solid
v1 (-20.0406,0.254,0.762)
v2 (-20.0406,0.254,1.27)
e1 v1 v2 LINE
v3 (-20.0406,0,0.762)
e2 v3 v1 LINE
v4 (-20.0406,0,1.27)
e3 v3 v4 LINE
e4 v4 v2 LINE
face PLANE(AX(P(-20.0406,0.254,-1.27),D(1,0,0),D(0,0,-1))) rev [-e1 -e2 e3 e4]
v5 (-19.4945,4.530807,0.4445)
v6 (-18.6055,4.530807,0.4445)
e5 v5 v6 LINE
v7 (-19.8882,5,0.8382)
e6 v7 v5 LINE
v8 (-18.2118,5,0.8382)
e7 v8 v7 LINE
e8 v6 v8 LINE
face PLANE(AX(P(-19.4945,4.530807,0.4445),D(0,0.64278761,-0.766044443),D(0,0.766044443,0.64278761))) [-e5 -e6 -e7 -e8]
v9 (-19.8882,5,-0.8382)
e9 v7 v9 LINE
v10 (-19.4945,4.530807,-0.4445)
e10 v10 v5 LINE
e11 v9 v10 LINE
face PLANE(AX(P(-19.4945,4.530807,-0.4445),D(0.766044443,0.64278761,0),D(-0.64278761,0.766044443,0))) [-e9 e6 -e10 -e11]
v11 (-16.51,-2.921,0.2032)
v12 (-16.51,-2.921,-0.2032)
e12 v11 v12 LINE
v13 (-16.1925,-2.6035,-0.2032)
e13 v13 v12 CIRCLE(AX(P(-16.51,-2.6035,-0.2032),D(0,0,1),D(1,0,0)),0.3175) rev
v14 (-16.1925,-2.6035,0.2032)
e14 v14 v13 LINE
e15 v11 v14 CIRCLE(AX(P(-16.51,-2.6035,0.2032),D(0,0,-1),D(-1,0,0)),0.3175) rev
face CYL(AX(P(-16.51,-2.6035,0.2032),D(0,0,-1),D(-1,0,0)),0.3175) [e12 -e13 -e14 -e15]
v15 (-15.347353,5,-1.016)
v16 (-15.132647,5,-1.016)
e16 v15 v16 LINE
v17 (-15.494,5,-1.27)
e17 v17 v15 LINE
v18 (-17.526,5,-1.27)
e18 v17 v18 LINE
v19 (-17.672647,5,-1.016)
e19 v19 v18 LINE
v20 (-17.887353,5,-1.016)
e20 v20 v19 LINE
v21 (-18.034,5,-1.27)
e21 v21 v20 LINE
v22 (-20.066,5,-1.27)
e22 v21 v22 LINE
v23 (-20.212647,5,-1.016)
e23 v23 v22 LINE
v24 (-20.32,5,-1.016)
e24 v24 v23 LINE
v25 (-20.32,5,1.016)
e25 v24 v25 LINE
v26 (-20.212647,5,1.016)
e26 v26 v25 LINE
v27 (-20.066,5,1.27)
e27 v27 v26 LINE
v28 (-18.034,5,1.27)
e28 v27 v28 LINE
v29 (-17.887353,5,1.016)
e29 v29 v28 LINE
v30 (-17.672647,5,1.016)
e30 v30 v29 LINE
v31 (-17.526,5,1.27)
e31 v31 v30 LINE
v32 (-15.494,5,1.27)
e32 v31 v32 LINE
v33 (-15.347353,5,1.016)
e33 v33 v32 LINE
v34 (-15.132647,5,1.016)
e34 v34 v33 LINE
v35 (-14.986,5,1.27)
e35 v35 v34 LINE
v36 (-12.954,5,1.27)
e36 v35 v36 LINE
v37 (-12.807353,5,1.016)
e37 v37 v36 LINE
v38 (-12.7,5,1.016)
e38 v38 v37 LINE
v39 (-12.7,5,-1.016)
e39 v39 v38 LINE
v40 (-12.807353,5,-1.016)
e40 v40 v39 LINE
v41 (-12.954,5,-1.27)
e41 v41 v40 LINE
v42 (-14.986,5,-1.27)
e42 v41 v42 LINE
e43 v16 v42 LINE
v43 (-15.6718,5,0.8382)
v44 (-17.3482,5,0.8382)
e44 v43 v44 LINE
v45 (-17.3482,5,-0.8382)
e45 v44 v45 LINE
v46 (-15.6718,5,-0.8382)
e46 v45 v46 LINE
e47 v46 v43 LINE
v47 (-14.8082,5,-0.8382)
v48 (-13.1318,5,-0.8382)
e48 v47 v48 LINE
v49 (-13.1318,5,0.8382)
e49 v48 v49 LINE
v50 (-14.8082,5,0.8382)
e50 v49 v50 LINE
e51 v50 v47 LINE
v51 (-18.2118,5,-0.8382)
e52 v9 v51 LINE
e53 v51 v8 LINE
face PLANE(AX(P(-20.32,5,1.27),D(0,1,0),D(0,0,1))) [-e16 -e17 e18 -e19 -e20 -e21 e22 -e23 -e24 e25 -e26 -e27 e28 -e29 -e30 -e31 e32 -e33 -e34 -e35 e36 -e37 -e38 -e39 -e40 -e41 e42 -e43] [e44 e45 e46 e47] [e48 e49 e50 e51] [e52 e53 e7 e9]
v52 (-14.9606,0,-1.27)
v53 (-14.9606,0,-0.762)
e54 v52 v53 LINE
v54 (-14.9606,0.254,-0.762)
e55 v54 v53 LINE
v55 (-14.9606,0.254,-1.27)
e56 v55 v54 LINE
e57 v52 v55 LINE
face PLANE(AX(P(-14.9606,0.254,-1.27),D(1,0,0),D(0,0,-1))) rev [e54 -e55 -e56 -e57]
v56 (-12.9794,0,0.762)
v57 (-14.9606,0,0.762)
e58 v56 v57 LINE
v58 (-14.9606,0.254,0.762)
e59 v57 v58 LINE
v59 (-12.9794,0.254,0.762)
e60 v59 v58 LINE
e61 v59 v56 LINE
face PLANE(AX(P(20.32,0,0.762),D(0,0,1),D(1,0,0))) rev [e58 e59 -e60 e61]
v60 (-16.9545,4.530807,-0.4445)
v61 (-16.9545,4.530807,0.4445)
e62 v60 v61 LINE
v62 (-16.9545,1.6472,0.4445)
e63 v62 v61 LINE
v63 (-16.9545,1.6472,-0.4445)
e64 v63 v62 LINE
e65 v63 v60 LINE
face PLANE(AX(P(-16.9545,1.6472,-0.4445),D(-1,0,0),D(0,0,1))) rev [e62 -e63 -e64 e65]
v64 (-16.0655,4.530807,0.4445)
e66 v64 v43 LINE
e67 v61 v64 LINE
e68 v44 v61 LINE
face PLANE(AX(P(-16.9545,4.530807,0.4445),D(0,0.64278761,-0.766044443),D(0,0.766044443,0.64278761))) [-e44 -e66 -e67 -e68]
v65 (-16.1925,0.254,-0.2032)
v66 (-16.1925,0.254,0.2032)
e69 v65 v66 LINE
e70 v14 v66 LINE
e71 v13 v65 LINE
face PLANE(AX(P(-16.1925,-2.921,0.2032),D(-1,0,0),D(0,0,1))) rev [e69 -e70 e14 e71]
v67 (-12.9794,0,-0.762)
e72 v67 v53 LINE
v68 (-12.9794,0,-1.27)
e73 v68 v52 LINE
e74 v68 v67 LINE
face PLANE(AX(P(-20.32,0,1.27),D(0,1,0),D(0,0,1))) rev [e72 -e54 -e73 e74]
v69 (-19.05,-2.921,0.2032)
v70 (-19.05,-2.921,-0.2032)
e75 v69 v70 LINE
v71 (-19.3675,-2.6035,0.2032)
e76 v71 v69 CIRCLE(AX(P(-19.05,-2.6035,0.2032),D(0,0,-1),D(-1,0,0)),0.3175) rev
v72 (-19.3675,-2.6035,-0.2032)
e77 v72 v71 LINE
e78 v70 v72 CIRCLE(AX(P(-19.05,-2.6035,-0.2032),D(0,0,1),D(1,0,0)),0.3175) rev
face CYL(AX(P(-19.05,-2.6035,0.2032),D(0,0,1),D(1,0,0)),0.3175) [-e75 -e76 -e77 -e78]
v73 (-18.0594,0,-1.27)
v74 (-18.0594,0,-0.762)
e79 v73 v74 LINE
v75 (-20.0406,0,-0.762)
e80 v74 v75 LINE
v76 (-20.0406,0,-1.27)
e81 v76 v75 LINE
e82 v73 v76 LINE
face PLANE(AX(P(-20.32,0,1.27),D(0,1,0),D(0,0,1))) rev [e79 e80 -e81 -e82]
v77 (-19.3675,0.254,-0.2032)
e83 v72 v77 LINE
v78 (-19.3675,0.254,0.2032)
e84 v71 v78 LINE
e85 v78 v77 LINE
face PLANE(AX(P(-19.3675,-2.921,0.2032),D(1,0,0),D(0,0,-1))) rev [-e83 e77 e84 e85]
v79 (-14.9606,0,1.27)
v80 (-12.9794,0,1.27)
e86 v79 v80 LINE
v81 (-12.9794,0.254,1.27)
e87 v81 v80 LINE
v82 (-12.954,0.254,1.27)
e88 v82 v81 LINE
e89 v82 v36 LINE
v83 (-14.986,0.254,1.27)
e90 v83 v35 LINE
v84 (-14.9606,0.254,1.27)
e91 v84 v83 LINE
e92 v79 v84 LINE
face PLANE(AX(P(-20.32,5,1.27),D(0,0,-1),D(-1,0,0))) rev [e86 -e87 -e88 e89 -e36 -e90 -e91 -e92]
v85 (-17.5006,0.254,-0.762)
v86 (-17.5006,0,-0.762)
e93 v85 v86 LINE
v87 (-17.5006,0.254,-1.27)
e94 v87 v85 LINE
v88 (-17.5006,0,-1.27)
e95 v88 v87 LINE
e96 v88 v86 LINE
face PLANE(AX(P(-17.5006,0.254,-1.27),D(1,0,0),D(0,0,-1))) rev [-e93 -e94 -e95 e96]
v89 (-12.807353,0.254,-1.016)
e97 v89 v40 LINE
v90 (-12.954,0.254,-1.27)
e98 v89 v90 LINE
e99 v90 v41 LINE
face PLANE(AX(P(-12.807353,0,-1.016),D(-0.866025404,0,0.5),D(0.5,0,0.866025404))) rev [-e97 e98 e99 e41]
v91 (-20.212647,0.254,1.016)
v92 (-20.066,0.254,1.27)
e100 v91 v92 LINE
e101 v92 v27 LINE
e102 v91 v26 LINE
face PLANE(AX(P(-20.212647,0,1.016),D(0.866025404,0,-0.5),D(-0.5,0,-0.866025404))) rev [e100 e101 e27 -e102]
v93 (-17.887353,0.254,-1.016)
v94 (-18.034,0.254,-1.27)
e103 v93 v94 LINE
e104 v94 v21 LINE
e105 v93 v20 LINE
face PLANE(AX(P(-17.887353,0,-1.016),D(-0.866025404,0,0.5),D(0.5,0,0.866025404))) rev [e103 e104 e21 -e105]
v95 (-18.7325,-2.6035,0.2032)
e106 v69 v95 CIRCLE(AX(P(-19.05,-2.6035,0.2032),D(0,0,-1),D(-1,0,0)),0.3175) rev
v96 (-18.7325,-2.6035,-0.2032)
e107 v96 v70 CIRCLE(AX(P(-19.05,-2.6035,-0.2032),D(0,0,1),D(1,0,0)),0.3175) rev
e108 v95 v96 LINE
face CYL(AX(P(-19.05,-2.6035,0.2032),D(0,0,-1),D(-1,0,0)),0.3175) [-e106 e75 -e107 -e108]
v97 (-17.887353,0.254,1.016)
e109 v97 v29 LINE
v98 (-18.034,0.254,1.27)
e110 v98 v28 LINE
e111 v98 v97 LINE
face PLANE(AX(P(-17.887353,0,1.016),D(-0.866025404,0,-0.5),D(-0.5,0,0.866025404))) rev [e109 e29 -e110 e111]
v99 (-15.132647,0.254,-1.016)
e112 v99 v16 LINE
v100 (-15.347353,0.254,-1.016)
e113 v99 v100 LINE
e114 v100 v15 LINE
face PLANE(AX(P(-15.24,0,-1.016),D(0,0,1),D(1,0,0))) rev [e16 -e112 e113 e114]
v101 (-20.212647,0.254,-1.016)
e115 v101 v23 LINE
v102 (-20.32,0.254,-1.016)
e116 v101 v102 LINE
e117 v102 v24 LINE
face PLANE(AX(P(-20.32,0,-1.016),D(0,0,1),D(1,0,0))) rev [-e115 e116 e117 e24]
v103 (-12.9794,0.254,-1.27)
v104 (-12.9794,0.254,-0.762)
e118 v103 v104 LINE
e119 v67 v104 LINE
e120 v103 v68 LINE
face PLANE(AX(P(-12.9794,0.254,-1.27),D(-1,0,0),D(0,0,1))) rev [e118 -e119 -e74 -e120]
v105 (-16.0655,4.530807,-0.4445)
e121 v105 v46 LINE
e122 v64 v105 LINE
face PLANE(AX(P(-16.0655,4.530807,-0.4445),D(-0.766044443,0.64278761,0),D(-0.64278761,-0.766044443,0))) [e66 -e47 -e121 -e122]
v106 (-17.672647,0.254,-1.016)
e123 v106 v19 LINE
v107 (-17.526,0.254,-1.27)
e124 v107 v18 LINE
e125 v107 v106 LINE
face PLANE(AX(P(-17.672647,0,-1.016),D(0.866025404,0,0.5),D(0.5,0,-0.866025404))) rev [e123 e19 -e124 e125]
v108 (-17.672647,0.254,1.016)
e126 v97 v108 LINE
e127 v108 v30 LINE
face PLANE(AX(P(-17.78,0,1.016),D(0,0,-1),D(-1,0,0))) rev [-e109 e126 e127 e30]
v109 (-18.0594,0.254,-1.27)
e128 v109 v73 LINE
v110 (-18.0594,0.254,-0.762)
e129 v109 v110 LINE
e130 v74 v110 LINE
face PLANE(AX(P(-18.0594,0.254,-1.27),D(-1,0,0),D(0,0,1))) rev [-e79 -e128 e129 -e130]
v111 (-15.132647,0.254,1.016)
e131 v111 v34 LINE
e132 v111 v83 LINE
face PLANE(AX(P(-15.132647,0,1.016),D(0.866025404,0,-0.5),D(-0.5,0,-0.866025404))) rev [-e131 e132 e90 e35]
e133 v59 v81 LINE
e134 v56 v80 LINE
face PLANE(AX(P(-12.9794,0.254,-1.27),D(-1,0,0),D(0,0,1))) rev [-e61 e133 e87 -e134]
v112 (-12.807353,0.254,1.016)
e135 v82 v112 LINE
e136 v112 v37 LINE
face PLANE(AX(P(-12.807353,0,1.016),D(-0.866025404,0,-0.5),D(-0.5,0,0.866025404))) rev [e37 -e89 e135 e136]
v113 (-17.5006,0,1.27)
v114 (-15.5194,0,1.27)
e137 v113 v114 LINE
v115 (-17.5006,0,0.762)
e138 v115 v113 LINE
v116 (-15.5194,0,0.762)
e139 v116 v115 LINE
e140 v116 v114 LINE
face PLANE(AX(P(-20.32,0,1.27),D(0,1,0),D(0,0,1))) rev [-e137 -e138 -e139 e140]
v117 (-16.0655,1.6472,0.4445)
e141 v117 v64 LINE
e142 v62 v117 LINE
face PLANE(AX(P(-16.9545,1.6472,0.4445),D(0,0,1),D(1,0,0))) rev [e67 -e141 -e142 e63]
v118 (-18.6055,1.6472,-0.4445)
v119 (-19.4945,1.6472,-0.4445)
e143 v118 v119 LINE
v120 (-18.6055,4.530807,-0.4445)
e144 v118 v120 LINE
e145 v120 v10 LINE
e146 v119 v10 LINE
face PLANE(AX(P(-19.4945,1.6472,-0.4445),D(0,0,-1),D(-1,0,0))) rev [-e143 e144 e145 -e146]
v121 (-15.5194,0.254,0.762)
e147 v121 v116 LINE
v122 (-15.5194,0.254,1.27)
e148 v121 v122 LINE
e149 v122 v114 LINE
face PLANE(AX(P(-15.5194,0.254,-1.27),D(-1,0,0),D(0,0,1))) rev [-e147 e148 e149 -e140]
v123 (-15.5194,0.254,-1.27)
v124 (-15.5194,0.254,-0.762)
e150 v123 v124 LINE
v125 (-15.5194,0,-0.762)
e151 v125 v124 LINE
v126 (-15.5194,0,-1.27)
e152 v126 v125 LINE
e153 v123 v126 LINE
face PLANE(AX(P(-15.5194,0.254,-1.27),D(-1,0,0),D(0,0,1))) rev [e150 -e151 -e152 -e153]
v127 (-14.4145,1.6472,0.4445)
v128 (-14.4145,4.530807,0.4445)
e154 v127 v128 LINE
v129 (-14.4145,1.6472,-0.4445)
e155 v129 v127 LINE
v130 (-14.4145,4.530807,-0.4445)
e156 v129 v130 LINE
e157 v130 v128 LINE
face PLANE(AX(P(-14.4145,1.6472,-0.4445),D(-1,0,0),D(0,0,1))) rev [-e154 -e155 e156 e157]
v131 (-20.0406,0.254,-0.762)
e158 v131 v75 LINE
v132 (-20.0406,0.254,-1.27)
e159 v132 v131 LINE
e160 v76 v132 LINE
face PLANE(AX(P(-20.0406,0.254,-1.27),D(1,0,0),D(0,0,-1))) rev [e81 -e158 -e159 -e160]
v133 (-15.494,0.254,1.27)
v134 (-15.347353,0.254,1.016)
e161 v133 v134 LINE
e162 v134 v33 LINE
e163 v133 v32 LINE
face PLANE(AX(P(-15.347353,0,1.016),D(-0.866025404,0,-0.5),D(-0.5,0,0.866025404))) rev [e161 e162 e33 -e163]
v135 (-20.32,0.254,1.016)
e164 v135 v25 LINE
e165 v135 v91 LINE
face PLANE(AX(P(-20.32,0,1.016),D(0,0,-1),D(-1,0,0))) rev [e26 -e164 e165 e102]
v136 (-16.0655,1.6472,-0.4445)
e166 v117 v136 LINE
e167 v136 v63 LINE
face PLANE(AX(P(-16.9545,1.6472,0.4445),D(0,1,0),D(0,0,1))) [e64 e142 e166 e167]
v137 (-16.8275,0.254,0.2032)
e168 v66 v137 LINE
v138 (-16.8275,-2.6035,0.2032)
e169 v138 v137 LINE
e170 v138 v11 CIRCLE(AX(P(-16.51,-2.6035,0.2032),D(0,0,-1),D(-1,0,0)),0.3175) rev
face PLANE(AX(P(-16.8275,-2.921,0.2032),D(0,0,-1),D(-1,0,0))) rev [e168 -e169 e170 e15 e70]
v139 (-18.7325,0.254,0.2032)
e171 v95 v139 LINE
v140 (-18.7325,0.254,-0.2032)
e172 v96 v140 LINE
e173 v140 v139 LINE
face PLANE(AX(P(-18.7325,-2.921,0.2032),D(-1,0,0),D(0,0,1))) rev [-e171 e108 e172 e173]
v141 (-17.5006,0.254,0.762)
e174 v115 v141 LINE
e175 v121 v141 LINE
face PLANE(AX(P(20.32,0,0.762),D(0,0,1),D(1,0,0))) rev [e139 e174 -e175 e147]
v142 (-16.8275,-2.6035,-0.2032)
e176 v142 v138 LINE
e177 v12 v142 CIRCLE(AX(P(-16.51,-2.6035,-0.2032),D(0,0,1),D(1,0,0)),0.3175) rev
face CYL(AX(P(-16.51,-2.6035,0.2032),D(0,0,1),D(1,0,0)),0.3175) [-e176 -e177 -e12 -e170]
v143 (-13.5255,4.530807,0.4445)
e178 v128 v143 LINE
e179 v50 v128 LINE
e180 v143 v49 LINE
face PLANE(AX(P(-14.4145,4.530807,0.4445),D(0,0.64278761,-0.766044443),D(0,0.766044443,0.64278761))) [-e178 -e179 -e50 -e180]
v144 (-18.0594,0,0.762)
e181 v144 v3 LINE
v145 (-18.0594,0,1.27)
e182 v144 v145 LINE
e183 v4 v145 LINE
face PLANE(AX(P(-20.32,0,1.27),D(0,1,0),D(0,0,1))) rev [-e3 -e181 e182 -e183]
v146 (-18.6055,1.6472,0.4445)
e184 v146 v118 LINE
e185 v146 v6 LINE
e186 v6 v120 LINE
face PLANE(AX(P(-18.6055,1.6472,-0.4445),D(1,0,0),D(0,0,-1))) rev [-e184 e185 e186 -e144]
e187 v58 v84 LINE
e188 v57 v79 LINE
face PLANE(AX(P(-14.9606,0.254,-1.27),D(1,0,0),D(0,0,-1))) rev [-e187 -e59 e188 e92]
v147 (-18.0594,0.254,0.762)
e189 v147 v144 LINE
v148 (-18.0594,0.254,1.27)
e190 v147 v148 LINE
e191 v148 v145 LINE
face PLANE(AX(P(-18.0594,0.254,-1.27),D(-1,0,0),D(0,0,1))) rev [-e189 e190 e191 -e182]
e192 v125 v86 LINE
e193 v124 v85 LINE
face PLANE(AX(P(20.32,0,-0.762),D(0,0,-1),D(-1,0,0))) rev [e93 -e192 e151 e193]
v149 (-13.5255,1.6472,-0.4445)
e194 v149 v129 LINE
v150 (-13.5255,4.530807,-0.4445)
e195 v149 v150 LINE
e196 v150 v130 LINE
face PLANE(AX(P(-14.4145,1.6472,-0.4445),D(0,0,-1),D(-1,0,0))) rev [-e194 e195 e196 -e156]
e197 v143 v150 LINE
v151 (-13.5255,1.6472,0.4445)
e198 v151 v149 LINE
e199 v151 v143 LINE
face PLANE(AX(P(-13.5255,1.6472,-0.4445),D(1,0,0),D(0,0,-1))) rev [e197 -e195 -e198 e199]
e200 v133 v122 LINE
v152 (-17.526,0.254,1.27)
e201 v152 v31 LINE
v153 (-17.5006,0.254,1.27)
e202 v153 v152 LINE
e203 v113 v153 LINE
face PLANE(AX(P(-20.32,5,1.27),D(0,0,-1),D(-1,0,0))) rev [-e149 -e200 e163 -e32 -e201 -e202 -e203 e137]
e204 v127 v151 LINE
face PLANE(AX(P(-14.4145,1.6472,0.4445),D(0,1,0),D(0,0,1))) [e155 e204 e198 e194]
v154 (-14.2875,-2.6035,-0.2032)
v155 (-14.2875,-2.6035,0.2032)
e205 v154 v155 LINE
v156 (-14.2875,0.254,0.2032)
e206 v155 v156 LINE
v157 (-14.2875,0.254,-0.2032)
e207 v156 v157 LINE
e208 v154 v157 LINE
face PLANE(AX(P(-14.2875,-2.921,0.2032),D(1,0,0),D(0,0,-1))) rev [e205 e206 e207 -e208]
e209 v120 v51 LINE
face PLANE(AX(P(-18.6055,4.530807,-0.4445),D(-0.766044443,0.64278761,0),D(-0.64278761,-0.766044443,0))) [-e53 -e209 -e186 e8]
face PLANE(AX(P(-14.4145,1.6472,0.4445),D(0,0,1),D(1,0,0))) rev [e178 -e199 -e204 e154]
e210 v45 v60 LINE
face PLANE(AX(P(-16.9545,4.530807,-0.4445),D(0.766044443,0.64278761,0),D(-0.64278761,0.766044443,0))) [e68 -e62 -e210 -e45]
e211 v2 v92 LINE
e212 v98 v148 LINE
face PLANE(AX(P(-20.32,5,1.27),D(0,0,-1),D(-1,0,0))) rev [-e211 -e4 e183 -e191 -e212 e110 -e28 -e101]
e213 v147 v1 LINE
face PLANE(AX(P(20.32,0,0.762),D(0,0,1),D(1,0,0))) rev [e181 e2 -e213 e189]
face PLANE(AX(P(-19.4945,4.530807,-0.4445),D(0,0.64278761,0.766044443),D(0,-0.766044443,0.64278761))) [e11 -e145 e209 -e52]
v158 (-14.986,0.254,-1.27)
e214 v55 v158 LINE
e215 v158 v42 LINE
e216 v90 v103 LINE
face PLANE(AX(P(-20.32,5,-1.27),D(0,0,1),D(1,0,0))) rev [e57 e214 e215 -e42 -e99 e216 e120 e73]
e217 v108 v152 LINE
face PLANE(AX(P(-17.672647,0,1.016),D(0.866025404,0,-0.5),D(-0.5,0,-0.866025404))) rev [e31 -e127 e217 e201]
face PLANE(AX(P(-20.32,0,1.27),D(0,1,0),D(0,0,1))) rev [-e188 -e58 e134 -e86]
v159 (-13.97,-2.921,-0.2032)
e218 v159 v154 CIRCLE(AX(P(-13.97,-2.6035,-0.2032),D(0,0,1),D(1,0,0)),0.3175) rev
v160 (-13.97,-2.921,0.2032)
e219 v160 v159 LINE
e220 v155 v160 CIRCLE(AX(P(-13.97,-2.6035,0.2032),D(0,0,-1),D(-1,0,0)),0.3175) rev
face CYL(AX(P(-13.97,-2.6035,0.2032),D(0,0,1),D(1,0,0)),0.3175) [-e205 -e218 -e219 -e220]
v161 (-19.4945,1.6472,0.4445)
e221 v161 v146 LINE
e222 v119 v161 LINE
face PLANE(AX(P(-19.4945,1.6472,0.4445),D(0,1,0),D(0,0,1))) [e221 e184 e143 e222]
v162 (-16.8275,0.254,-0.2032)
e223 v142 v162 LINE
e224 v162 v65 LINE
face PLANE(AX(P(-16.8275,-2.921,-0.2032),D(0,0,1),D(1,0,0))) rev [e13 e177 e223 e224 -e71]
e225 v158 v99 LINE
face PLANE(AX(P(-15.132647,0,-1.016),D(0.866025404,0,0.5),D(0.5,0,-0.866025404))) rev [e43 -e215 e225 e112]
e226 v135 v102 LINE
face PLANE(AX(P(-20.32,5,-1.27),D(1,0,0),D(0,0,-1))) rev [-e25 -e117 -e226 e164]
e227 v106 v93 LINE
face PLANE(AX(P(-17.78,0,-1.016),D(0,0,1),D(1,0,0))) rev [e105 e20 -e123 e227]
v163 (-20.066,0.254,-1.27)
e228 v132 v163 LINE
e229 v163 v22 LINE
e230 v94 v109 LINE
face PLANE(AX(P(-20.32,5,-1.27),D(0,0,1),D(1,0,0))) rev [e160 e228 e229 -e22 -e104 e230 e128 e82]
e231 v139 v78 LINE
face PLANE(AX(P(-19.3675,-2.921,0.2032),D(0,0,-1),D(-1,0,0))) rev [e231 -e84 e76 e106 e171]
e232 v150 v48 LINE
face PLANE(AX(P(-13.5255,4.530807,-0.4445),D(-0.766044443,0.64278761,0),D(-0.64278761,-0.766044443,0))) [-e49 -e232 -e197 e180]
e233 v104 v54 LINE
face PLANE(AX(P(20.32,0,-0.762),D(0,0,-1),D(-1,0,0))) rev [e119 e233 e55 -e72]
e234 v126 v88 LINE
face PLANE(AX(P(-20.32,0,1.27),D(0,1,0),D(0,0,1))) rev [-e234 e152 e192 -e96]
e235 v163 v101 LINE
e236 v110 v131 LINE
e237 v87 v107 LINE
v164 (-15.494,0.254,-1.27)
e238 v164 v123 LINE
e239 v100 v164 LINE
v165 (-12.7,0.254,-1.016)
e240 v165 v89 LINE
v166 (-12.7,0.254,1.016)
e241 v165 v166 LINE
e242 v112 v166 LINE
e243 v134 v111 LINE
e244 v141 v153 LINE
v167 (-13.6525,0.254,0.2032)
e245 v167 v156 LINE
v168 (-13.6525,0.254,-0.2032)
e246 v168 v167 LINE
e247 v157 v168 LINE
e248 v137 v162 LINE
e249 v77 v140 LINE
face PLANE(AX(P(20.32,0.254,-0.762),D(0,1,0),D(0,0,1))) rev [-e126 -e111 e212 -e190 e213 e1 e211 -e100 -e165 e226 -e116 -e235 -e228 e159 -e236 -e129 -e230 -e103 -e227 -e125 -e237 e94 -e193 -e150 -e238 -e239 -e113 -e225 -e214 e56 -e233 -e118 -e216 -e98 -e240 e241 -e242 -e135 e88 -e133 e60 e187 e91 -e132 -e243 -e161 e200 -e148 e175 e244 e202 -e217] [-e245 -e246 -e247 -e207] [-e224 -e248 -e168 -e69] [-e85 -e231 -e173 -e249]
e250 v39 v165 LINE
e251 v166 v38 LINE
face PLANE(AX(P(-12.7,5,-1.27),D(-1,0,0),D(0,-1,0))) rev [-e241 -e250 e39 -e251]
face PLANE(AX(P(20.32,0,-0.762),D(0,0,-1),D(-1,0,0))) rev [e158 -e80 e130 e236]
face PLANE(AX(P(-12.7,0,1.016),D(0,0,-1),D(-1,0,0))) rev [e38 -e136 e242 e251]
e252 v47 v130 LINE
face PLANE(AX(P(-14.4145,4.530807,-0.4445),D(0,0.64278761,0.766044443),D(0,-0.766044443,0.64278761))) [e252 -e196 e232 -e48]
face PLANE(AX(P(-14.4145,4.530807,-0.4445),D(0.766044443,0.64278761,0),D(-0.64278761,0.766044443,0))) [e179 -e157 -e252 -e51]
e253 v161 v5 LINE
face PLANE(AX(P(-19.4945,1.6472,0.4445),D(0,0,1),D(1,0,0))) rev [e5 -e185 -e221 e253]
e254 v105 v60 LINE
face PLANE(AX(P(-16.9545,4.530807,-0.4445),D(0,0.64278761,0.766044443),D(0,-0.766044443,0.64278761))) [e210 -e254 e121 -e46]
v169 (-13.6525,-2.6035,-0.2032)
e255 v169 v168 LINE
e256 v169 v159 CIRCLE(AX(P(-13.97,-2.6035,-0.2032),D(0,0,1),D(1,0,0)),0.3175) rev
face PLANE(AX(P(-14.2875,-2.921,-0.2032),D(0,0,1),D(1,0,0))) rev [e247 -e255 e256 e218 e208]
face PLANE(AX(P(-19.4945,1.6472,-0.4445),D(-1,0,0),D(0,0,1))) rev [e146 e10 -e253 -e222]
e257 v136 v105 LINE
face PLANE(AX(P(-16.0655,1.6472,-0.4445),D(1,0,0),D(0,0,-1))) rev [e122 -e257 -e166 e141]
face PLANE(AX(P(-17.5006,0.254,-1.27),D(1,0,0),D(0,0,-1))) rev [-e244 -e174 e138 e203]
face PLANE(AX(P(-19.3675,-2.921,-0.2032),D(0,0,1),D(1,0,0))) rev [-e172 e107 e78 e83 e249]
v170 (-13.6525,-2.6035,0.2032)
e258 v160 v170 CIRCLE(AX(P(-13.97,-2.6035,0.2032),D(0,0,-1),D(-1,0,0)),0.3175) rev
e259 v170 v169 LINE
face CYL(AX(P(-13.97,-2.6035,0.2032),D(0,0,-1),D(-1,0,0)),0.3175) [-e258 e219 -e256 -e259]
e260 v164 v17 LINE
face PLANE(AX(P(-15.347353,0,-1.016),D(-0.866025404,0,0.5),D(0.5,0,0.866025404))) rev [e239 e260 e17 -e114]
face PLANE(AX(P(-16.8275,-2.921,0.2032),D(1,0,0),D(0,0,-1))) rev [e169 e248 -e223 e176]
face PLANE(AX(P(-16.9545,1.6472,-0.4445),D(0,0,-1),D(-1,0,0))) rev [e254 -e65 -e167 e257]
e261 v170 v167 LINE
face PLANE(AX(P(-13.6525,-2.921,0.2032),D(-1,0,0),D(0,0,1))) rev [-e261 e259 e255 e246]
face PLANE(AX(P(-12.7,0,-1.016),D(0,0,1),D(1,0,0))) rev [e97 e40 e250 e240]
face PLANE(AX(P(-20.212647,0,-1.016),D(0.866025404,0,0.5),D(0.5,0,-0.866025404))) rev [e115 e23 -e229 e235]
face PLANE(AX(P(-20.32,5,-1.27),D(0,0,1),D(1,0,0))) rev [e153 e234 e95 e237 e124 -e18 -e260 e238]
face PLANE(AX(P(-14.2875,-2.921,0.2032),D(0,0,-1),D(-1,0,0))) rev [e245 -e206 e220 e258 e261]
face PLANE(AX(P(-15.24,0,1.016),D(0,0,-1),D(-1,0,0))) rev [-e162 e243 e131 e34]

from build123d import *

# Parameters (mm, degrees)
SKETCH1_W                      = 40.64
SKETCH1_H                      = 2.54
BASE_EXTRUDE_DEPTH             = 5
SKETCH2_W                      = 1.524
SKETCH2_H                      = 0.254
STANDOFF_WIDTH_DEPTH           = 41.966114046
UPPER_START                    = -19.4945
UPPER_CORE_OUTLINE_W           = 3.3528
UPPER_CORE_OUTLINE_H           = 0.889
UPPER_CORE_DEPTH               = 0.889
LEAD_IN_SIZE                   = 0.3937
LEAD_IN_SIZE2                  = 0.469193389
CORE_PATTERN_COUNT             = 16
CORE_PATTERN_PITCH             = 2.54
LEAD_IN_OF_CORE_PATTERN_SIZE2  = 0.469193389
LEAD_IN_OF_CORE_PATTERN_SIZE   = 0.3937
POSITION_CUT_DEPTH             = 21.964620197
SKETCH10_W                     = 0.2794
SKETCH10_H                     = 0.254
STANDOFF_LENGTH_DEPTH          = 22.07970588
STANDOFF_PATTERN_COUNT         = 16
STANDOFF_PATTERN_PITCH         = 2.54
SKETCH11_W                     = 0.635
SKETCH11_H                     = 0.4064
TAIL_DEPTH                     = 3.175
TAIL_FILLETS_R                 = 0.3175
TAIL_PATTERN_COUNT             = 16
TAIL_PATTERN_PITCH             = 2.54
TAIL_FILLETS_OF_TAIL_PATTERN_R = 0.3175
SKETCH12_W                     = 33.02
SKETCH12_H                     = 7.921
CUT_EXTRUDE1_DEPTH             = 22.07970588


# Read off the part's stored shape, not the designer's step: Upper Core
with BuildPart() as part:
    # Sketch1 → Base-Extrude (new body)
    with BuildSketch(Plane(origin=(0, 0, 0), x_dir=(1, 0, 0), z_dir=(0, 1, 0))):
        Rectangle(SKETCH1_W, SKETCH1_H)
    extrude(amount=BASE_EXTRUDE_DEPTH)

    # Sketch2 → Standoff - Width (cut, through all)
    with BuildSketch(Plane.ZY.offset(20.32)):
        with Locations((0, 0.127)):
            Rectangle(SKETCH2_W, SKETCH2_H)
    extrude(amount=-STANDOFF_WIDTH_DEPTH, mode=Mode.SUBTRACT)

    # Upper Core outline → Upper Core (cut)
    with BuildSketch(Plane.YZ.offset(UPPER_START)):
        with Locations((3.3236, 0)):
            Rectangle(UPPER_CORE_OUTLINE_W, UPPER_CORE_OUTLINE_H)
    upper_core = extrude(amount=UPPER_CORE_DEPTH, mode=Mode.SUBTRACT)

    # Lead-in
    lead_in_edges = [part.edges().sort_by_distance(p)[0] for p in [
        (-19.4945, 5, 0),
        (-19.05, 5, 0.4445),
        (-18.6055, 5, 0),
        (-19.05, 5, -0.4445),
    ]]
    lead_in_side = [part.faces().sort_by_distance(p)[0] for p in [
        (0.146976854, 5, 0),
    ]]
    chamfer(lead_in_edges, length=LEAD_IN_SIZE, length2=LEAD_IN_SIZE2, reference=lead_in_side[0])

    # Core Pattern: Upper Core ×16
    with Locations(*[(i * CORE_PATTERN_PITCH, 0, 0) for i in range(1, CORE_PATTERN_COUNT)]):
        add(upper_core, mode=Mode.SUBTRACT)

    # Lead-in of Core Pattern
    lead_in_of_core_pattern_edges = [part.edges().sort_by_distance(p)[0] for p in [
        (-16.9545, 5, 0),
        (-16.51, 5, 0.4445),
        (-16.0655, 5, 0),
        (-16.51, 5, -0.4445),
        (-14.4145, 5, 0),
        (-13.97, 5, 0.4445),
        (-13.5255, 5, 0),
        (-13.97, 5, -0.4445),
        (-11.8745, 5, 0),
        (-11.43, 5, 0.4445),
        (-10.9855, 5, 0),
        (-11.43, 5, -0.4445),
        (-9.3345, 5, 0),
        (-8.89, 5, 0.4445),
        (-8.4455, 5, 0),
        (-8.89, 5, -0.4445),
        (-6.7945, 5, 0),
        (-6.35, 5, 0.4445),
        (-5.9055, 5, 0),
        (-6.35, 5, -0.4445),
        (-4.2545, 5, 0),
        (-3.81, 5, 0.4445),
        (-3.3655, 5, 0),
        (-3.81, 5, -0.4445),
        (-1.7145, 5, 0),
        (-1.27, 5, 0.4445),
        (-0.8255, 5, 0),
        (-1.27, 5, -0.4445),
        (0.8255, 5, 0),
        (1.27, 5, 0.4445),
        (1.7145, 5, 0),
        (1.27, 5, -0.4445),
        (3.3655, 5, 0),
        (3.81, 5, 0.4445),
        (4.2545, 5, 0),
        (3.81, 5, -0.4445),
        (5.9055, 5, 0),
        (6.35, 5, 0.4445),
        (6.7945, 5, 0),
        (6.35, 5, -0.4445),
        (8.4455, 5, 0),
        (8.89, 5, 0.4445),
        (9.3345, 5, 0),
        (8.89, 5, -0.4445),
        (10.9855, 5, 0),
        (11.43, 5, 0.4445),
        (11.8745, 5, 0),
        (11.43, 5, -0.4445),
        (13.5255, 5, 0),
        (13.97, 5, 0.4445),
        (14.4145, 5, 0),
        (13.97, 5, -0.4445),
        (16.0655, 5, 0),
        (16.51, 5, 0.4445),
        (16.9545, 5, 0),
        (16.51, 5, -0.4445),
        (18.6055, 5, 0),
        (19.05, 5, 0.4445),
        (19.4945, 5, 0),
        (19.05, 5, -0.4445),
    ]]
    chamfer(lead_in_of_core_pattern_edges, length=LEAD_IN_OF_CORE_PATTERN_SIZE, length2=LEAD_IN_OF_CORE_PATTERN_SIZE2)

    # Sketch4 → Position Cut (cut, through all)
    with BuildSketch(Plane(origin=(0, 5, 0), x_dir=(-1, 0, 0), z_dir=(0, 1, 0))):
        Polygon((20.32, 1.016), (20.212646968, 1.016), (20.066, 1.27), (20.32, 1.27), align=None)
        Polygon((20.066, -1.27), (20.32, -1.27), (20.32, -1.016), (20.212646968, -1.016), align=None)
        Polygon((17.78, -1.016), (17.887353032, -1.016), (18.034, -1.27), (17.78, -1.27), align=None)
        Polygon((18.034, 1.27), (17.78, 1.27), (17.78, 1.016), (17.887353032, 1.016), align=None)
    position_cut = extrude(amount=-POSITION_CUT_DEPTH, mode=Mode.SUBTRACT)

    # Sketch10 → Standoff - Length (cut, through all)
    with BuildSketch(Plane.XY.offset(1.27)):
        with Locations((-17.9197, 0.127)):
            Rectangle(SKETCH10_W, SKETCH10_H)
        with Locations((-20.1803, 0.127)):
            Rectangle(SKETCH10_W, SKETCH10_H)
    standoff_length = extrude(amount=-STANDOFF_LENGTH_DEPTH, mode=Mode.SUBTRACT)

    # Standoff Pattern: Position Cut, Standoff - Length ×16
    with Locations(*[(i * STANDOFF_PATTERN_PITCH, 0, 0) for i in range(1, STANDOFF_PATTERN_COUNT)]):
        add(position_cut, mode=Mode.SUBTRACT)
        add(standoff_length, mode=Mode.SUBTRACT)

    # Sketch11 → Tail (add)
    with BuildSketch(Plane.XZ.offset(-0.254)):
        with Locations((-19.05, 0)):
            Rectangle(SKETCH11_W, SKETCH11_H)
    tail = extrude(amount=TAIL_DEPTH)

    # Tail Fillets
    tail_fillets_edges = [part.edges().sort_by_distance(p)[0] for p in [
        (-19.3675, -2.921, 0),
        (-18.7325, -2.921, 0),
    ]]
    fillet(tail_fillets_edges, radius=TAIL_FILLETS_R - 0.0001)  # a hair under: the kernel refuses the full size

    # Tail Pattern: Tail ×16
    with Locations(*[(i * TAIL_PATTERN_PITCH, 0, 0) for i in range(1, TAIL_PATTERN_COUNT)]):
        add(tail)

    # Tail Fillets of Tail Pattern
    tail_fillets_of_tail_pattern_edges = [part.edges().sort_by_distance(p)[0] for p in [
        (-16.8275, -2.921, 0),
        (-16.1925, -2.921, 0),
        (-14.2875, -2.921, 0),
        (-13.6525, -2.921, 0),
        (-11.7475, -2.921, 0),
        (-11.1125, -2.921, 0),
        (-9.2075, -2.921, 0),
        (-8.5725, -2.921, 0),
        (-6.6675, -2.921, 0),
        (-6.0325, -2.921, 0),
        (-4.1275, -2.921, 0),
        (-3.4925, -2.921, 0),
        (-1.5875, -2.921, 0),
        (-0.9525, -2.921, 0),
        (0.9525, -2.921, 0),
        (1.5875, -2.921, 0),
        (3.4925, -2.921, 0),
        (4.1275, -2.921, 0),
        (6.0325, -2.921, 0),
        (6.6675, -2.921, 0),
        (8.5725, -2.921, 0),
        (9.2075, -2.921, 0),
        (11.1125, -2.921, 0),
        (11.7475, -2.921, 0),
        (13.6525, -2.921, 0),
        (14.2875, -2.921, 0),
        (16.1925, -2.921, 0),
        (16.8275, -2.921, 0),
        (18.7325, -2.921, 0),
        (19.3675, -2.921, 0),
    ]]
    fillet(tail_fillets_of_tail_pattern_edges, radius=TAIL_FILLETS_OF_TAIL_PATTERN_R - 0.0001)  # a hair under: the kernel refuses the full size

    # Sketch12 → Cut-Extrude1 (cut, through all)
    with BuildSketch(Plane.XY.offset(1.27)):
        with Locations((3.81, 1.0395)):
            Rectangle(SKETCH12_W, SKETCH12_H)
    extrude(amount=-CUT_EXTRUDE1_DEPTH, mode=Mode.SUBTRACT)


solid = part.part
